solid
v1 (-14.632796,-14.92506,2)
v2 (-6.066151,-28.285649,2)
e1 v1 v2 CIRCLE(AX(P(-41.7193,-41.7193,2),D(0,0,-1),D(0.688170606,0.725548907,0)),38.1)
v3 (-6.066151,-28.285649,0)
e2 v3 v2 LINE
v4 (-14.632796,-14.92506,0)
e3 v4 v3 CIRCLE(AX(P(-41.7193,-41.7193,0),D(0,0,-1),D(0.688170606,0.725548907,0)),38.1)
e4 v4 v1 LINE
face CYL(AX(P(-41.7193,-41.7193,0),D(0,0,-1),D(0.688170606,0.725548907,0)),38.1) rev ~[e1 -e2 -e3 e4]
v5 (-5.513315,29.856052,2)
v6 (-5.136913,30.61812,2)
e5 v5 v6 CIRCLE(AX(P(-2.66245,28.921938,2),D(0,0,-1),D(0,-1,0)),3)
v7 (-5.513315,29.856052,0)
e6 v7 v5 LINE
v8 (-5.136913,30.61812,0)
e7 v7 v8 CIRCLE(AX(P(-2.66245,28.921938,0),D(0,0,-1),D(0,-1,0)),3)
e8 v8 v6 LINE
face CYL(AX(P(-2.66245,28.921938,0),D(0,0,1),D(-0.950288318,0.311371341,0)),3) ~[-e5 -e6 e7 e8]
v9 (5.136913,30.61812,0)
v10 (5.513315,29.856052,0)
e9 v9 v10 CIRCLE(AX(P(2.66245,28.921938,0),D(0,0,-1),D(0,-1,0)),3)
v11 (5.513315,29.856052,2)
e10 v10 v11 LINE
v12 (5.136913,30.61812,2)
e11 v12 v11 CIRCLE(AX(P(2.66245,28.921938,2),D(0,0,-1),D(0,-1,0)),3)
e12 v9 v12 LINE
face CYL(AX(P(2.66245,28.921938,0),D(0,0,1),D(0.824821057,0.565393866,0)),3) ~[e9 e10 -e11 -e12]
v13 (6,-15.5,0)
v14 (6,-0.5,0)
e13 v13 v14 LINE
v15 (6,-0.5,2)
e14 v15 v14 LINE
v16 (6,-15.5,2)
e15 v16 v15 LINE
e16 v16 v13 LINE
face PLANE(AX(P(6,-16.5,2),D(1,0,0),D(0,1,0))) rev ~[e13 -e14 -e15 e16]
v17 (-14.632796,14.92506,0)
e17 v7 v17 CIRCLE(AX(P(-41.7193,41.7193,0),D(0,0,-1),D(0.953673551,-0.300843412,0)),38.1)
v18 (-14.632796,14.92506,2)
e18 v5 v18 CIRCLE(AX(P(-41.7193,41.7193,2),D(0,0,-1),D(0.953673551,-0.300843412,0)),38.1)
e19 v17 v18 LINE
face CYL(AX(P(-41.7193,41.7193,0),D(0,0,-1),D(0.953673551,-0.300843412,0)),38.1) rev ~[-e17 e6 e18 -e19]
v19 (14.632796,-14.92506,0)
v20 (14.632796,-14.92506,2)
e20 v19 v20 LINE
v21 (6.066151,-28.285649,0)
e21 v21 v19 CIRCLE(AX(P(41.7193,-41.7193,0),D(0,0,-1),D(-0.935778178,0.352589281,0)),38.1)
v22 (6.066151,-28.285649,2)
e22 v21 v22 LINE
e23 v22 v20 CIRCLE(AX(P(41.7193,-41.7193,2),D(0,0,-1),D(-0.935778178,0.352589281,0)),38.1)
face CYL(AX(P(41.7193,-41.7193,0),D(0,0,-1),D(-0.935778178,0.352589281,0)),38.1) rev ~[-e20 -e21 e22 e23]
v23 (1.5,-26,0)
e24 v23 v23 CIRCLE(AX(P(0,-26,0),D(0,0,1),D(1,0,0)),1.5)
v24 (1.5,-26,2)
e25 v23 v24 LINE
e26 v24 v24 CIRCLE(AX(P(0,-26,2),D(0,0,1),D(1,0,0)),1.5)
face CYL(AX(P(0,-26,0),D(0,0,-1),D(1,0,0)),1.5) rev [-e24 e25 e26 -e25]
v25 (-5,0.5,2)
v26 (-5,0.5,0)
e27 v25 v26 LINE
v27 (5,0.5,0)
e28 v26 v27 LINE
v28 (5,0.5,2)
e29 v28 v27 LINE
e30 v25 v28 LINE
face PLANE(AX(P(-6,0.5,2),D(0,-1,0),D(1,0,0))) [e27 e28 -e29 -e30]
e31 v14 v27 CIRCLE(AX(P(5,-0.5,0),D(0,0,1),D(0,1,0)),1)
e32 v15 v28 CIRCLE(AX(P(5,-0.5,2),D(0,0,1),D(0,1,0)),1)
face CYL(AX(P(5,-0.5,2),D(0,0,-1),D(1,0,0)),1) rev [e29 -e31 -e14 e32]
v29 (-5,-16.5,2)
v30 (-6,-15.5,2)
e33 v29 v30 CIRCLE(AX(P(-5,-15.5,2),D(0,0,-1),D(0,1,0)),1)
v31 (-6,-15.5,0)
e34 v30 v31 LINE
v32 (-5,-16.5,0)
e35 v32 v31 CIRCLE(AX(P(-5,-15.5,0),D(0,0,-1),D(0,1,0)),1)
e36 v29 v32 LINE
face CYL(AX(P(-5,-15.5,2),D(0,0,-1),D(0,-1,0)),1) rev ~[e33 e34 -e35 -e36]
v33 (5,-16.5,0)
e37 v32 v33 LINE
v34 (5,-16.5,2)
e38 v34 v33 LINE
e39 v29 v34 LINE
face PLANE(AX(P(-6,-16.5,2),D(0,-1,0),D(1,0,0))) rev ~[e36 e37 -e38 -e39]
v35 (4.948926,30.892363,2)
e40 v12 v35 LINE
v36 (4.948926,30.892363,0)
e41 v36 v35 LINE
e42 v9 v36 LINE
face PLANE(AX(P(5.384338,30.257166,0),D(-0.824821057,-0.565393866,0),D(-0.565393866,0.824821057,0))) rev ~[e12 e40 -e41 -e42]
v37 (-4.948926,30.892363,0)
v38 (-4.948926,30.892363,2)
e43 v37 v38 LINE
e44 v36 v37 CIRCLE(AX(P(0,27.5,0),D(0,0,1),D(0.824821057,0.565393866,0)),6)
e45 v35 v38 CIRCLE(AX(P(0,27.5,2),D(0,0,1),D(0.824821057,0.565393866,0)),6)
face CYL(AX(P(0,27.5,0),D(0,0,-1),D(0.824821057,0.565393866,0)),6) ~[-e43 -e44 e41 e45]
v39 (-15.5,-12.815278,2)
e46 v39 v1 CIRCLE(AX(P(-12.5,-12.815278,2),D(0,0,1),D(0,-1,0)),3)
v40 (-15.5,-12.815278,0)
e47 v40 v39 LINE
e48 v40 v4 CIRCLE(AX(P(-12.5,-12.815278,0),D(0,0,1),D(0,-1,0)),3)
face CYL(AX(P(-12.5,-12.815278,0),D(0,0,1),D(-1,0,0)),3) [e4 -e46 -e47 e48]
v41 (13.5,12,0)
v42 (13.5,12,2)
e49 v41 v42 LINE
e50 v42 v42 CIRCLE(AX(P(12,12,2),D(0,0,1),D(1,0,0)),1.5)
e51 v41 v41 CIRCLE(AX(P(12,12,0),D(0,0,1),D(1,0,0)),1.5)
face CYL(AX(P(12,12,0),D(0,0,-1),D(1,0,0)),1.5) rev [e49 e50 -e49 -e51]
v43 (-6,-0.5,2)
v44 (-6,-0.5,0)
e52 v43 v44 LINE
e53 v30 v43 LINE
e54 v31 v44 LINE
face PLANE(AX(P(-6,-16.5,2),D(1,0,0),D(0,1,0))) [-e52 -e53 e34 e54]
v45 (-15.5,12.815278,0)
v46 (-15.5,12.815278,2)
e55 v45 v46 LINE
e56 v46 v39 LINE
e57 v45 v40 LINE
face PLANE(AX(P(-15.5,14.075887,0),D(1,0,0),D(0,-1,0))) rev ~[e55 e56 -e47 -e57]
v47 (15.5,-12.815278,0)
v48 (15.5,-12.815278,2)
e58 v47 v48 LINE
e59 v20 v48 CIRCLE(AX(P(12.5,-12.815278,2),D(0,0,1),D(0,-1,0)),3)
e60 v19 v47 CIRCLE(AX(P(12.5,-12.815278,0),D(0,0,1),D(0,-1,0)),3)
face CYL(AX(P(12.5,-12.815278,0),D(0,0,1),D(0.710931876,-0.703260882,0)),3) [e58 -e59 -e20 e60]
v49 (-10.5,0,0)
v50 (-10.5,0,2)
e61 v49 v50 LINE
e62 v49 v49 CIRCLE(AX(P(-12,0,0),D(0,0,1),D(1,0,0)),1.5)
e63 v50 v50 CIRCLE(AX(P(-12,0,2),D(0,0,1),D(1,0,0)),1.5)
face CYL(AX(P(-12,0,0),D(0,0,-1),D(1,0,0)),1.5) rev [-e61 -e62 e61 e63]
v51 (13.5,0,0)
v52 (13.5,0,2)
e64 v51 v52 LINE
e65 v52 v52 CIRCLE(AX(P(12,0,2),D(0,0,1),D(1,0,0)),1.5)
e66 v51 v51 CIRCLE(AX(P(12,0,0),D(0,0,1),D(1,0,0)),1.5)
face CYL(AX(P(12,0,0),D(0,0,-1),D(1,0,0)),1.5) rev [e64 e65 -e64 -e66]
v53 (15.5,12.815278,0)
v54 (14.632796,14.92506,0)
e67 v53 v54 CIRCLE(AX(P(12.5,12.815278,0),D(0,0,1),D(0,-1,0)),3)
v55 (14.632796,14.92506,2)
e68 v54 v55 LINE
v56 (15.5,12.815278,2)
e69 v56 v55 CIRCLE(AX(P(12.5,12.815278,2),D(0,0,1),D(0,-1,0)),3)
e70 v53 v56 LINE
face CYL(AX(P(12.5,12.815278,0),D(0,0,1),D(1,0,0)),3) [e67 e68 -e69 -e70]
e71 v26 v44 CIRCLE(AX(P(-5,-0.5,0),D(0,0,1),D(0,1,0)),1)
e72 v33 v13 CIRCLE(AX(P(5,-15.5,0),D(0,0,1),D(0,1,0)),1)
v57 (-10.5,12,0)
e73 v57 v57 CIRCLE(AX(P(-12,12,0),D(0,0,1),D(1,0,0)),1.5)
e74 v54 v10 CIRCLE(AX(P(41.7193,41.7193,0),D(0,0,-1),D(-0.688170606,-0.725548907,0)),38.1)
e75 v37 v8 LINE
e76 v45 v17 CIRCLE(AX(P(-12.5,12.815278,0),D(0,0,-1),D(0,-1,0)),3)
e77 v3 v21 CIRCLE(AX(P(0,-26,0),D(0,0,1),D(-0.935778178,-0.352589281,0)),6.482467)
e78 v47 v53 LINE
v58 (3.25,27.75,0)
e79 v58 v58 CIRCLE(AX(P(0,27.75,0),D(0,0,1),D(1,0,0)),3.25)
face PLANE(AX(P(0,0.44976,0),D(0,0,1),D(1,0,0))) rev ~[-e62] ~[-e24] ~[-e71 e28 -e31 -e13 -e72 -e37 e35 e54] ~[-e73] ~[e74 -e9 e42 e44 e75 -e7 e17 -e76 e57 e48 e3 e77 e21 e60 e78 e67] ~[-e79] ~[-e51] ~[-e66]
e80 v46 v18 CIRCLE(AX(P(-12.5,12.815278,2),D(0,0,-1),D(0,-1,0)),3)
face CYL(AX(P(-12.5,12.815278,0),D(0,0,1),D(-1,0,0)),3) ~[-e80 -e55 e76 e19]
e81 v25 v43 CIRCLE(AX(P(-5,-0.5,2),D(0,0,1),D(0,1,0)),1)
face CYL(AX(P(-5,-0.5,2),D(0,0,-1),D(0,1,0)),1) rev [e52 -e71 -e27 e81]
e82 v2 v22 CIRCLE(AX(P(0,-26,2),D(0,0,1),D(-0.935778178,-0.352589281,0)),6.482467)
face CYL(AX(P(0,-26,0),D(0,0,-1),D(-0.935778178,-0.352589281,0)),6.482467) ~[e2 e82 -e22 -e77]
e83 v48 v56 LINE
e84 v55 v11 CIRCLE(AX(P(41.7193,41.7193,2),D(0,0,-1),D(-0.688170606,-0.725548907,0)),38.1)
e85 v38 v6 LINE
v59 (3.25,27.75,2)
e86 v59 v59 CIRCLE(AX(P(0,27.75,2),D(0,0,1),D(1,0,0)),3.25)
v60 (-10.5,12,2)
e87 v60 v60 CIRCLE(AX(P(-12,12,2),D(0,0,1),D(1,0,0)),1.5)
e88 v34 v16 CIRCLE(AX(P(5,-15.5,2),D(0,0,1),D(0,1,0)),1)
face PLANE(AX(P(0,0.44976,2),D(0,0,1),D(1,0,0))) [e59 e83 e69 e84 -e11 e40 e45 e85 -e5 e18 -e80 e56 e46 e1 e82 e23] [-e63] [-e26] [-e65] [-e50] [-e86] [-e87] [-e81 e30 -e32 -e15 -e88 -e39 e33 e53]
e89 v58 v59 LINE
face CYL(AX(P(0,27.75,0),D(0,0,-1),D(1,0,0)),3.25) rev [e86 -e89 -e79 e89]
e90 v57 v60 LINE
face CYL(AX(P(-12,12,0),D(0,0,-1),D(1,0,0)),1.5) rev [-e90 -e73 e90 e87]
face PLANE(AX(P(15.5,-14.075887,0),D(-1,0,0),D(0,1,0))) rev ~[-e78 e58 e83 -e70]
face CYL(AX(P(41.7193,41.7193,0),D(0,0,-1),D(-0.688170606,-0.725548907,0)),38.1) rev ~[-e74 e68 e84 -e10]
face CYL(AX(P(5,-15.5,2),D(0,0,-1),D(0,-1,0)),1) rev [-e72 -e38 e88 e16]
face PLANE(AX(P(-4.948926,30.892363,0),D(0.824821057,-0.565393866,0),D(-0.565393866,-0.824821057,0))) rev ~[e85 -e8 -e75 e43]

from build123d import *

# Parameters (mm, degrees)
F0_R     = 1.5
F0_R_2   = 3.25
F1_DEPTH = 2
F2_R     = 3
F3_W     = 12
F3_H     = 17
F4_DEPTH = 25
F5_R     = 1


with BuildPart() as f1:
    # F0 (on Top) → F1 (new body)
    with BuildSketch(Plane.XY):
        with BuildLine():
            Line((-15.5, 14.0758867192), (-15.5, -14.0758867192))
            ThreePointArc((-15.5, -14.0758867192), (-9.9776979071, -20.6460779619), (-6.0661514917, -28.2856485004))
            ThreePointArc((-6.0661514917, -28.2856485004), (0, -32.4824673534), (6.0661514917, -28.2856485004))
            ThreePointArc((6.0661514917, -28.2856485004), (9.9776979071, -20.6460779619), (15.5, -14.0758867192))
            Line((15.5, -14.0758867192), (15.5, 14.0758867192))
            ThreePointArc((15.5, 14.0758867192), (9.4126848848, 21.5229485882), (5.3843378024, 30.2571661019))
            Line((5.3843378024, 30.2571661019), (4.948926344, 30.8923631943))
            ThreePointArc((4.948926344, 30.8923631943), (0, 33.5), (-4.948926344, 30.8923631943))
            Line((-4.948926344, 30.8923631943), (-5.3843378024, 30.2571661019))
            ThreePointArc((-5.3843378024, 30.2571661019), (-9.4126848848, 21.5229485882), (-15.5, 14.0758867192))
        make_face()
        with Locations((0, -26)):
            Circle(F0_R, mode=Mode.SUBTRACT)
        with Locations((-12, 0)):
            Circle(F0_R, mode=Mode.SUBTRACT)
        with Locations((12, 0)):
            Circle(F0_R, mode=Mode.SUBTRACT)
        with Locations((-12, 12)):
            Circle(F0_R, mode=Mode.SUBTRACT)
        with Locations((0, 27.75)):
            Circle(F0_R_2, mode=Mode.SUBTRACT)
        with Locations((12, 12)):
            Circle(F0_R, mode=Mode.SUBTRACT)
    extrude(amount=F1_DEPTH)

    # F2
    f2_edges = [f1.edges().sort_by_distance(p)[0] for p in [
        (-15.5, 14.075887, 1),
        (5.384338, 30.257166, 1),
        (-5.384338, 30.257166, 1),
        (-15.5, -14.075887, 1),
        (15.5, -14.075887, 1),
        (15.5, 14.075887, 1),
    ]]
    fillet(f2_edges, radius=F2_R)

    # F3 (on face) → F4 (cut)
    with BuildSketch(Plane.XY.offset(2)):
        with Locations((0, -8)):
            Rectangle(F3_W, F3_H)
    extrude(amount=-F4_DEPTH, mode=Mode.SUBTRACT)

    # F5
    f5_edges = [f1.edges().sort_by_distance(p)[0] for p in [
        (-6, 0.5, 1),
        (6, 0.5, 1),
        (6, -16.5, 1),
        (-6, -16.5, 1),
    ]]
    fillet(f5_edges, radius=F5_R)


solid = f1.part
